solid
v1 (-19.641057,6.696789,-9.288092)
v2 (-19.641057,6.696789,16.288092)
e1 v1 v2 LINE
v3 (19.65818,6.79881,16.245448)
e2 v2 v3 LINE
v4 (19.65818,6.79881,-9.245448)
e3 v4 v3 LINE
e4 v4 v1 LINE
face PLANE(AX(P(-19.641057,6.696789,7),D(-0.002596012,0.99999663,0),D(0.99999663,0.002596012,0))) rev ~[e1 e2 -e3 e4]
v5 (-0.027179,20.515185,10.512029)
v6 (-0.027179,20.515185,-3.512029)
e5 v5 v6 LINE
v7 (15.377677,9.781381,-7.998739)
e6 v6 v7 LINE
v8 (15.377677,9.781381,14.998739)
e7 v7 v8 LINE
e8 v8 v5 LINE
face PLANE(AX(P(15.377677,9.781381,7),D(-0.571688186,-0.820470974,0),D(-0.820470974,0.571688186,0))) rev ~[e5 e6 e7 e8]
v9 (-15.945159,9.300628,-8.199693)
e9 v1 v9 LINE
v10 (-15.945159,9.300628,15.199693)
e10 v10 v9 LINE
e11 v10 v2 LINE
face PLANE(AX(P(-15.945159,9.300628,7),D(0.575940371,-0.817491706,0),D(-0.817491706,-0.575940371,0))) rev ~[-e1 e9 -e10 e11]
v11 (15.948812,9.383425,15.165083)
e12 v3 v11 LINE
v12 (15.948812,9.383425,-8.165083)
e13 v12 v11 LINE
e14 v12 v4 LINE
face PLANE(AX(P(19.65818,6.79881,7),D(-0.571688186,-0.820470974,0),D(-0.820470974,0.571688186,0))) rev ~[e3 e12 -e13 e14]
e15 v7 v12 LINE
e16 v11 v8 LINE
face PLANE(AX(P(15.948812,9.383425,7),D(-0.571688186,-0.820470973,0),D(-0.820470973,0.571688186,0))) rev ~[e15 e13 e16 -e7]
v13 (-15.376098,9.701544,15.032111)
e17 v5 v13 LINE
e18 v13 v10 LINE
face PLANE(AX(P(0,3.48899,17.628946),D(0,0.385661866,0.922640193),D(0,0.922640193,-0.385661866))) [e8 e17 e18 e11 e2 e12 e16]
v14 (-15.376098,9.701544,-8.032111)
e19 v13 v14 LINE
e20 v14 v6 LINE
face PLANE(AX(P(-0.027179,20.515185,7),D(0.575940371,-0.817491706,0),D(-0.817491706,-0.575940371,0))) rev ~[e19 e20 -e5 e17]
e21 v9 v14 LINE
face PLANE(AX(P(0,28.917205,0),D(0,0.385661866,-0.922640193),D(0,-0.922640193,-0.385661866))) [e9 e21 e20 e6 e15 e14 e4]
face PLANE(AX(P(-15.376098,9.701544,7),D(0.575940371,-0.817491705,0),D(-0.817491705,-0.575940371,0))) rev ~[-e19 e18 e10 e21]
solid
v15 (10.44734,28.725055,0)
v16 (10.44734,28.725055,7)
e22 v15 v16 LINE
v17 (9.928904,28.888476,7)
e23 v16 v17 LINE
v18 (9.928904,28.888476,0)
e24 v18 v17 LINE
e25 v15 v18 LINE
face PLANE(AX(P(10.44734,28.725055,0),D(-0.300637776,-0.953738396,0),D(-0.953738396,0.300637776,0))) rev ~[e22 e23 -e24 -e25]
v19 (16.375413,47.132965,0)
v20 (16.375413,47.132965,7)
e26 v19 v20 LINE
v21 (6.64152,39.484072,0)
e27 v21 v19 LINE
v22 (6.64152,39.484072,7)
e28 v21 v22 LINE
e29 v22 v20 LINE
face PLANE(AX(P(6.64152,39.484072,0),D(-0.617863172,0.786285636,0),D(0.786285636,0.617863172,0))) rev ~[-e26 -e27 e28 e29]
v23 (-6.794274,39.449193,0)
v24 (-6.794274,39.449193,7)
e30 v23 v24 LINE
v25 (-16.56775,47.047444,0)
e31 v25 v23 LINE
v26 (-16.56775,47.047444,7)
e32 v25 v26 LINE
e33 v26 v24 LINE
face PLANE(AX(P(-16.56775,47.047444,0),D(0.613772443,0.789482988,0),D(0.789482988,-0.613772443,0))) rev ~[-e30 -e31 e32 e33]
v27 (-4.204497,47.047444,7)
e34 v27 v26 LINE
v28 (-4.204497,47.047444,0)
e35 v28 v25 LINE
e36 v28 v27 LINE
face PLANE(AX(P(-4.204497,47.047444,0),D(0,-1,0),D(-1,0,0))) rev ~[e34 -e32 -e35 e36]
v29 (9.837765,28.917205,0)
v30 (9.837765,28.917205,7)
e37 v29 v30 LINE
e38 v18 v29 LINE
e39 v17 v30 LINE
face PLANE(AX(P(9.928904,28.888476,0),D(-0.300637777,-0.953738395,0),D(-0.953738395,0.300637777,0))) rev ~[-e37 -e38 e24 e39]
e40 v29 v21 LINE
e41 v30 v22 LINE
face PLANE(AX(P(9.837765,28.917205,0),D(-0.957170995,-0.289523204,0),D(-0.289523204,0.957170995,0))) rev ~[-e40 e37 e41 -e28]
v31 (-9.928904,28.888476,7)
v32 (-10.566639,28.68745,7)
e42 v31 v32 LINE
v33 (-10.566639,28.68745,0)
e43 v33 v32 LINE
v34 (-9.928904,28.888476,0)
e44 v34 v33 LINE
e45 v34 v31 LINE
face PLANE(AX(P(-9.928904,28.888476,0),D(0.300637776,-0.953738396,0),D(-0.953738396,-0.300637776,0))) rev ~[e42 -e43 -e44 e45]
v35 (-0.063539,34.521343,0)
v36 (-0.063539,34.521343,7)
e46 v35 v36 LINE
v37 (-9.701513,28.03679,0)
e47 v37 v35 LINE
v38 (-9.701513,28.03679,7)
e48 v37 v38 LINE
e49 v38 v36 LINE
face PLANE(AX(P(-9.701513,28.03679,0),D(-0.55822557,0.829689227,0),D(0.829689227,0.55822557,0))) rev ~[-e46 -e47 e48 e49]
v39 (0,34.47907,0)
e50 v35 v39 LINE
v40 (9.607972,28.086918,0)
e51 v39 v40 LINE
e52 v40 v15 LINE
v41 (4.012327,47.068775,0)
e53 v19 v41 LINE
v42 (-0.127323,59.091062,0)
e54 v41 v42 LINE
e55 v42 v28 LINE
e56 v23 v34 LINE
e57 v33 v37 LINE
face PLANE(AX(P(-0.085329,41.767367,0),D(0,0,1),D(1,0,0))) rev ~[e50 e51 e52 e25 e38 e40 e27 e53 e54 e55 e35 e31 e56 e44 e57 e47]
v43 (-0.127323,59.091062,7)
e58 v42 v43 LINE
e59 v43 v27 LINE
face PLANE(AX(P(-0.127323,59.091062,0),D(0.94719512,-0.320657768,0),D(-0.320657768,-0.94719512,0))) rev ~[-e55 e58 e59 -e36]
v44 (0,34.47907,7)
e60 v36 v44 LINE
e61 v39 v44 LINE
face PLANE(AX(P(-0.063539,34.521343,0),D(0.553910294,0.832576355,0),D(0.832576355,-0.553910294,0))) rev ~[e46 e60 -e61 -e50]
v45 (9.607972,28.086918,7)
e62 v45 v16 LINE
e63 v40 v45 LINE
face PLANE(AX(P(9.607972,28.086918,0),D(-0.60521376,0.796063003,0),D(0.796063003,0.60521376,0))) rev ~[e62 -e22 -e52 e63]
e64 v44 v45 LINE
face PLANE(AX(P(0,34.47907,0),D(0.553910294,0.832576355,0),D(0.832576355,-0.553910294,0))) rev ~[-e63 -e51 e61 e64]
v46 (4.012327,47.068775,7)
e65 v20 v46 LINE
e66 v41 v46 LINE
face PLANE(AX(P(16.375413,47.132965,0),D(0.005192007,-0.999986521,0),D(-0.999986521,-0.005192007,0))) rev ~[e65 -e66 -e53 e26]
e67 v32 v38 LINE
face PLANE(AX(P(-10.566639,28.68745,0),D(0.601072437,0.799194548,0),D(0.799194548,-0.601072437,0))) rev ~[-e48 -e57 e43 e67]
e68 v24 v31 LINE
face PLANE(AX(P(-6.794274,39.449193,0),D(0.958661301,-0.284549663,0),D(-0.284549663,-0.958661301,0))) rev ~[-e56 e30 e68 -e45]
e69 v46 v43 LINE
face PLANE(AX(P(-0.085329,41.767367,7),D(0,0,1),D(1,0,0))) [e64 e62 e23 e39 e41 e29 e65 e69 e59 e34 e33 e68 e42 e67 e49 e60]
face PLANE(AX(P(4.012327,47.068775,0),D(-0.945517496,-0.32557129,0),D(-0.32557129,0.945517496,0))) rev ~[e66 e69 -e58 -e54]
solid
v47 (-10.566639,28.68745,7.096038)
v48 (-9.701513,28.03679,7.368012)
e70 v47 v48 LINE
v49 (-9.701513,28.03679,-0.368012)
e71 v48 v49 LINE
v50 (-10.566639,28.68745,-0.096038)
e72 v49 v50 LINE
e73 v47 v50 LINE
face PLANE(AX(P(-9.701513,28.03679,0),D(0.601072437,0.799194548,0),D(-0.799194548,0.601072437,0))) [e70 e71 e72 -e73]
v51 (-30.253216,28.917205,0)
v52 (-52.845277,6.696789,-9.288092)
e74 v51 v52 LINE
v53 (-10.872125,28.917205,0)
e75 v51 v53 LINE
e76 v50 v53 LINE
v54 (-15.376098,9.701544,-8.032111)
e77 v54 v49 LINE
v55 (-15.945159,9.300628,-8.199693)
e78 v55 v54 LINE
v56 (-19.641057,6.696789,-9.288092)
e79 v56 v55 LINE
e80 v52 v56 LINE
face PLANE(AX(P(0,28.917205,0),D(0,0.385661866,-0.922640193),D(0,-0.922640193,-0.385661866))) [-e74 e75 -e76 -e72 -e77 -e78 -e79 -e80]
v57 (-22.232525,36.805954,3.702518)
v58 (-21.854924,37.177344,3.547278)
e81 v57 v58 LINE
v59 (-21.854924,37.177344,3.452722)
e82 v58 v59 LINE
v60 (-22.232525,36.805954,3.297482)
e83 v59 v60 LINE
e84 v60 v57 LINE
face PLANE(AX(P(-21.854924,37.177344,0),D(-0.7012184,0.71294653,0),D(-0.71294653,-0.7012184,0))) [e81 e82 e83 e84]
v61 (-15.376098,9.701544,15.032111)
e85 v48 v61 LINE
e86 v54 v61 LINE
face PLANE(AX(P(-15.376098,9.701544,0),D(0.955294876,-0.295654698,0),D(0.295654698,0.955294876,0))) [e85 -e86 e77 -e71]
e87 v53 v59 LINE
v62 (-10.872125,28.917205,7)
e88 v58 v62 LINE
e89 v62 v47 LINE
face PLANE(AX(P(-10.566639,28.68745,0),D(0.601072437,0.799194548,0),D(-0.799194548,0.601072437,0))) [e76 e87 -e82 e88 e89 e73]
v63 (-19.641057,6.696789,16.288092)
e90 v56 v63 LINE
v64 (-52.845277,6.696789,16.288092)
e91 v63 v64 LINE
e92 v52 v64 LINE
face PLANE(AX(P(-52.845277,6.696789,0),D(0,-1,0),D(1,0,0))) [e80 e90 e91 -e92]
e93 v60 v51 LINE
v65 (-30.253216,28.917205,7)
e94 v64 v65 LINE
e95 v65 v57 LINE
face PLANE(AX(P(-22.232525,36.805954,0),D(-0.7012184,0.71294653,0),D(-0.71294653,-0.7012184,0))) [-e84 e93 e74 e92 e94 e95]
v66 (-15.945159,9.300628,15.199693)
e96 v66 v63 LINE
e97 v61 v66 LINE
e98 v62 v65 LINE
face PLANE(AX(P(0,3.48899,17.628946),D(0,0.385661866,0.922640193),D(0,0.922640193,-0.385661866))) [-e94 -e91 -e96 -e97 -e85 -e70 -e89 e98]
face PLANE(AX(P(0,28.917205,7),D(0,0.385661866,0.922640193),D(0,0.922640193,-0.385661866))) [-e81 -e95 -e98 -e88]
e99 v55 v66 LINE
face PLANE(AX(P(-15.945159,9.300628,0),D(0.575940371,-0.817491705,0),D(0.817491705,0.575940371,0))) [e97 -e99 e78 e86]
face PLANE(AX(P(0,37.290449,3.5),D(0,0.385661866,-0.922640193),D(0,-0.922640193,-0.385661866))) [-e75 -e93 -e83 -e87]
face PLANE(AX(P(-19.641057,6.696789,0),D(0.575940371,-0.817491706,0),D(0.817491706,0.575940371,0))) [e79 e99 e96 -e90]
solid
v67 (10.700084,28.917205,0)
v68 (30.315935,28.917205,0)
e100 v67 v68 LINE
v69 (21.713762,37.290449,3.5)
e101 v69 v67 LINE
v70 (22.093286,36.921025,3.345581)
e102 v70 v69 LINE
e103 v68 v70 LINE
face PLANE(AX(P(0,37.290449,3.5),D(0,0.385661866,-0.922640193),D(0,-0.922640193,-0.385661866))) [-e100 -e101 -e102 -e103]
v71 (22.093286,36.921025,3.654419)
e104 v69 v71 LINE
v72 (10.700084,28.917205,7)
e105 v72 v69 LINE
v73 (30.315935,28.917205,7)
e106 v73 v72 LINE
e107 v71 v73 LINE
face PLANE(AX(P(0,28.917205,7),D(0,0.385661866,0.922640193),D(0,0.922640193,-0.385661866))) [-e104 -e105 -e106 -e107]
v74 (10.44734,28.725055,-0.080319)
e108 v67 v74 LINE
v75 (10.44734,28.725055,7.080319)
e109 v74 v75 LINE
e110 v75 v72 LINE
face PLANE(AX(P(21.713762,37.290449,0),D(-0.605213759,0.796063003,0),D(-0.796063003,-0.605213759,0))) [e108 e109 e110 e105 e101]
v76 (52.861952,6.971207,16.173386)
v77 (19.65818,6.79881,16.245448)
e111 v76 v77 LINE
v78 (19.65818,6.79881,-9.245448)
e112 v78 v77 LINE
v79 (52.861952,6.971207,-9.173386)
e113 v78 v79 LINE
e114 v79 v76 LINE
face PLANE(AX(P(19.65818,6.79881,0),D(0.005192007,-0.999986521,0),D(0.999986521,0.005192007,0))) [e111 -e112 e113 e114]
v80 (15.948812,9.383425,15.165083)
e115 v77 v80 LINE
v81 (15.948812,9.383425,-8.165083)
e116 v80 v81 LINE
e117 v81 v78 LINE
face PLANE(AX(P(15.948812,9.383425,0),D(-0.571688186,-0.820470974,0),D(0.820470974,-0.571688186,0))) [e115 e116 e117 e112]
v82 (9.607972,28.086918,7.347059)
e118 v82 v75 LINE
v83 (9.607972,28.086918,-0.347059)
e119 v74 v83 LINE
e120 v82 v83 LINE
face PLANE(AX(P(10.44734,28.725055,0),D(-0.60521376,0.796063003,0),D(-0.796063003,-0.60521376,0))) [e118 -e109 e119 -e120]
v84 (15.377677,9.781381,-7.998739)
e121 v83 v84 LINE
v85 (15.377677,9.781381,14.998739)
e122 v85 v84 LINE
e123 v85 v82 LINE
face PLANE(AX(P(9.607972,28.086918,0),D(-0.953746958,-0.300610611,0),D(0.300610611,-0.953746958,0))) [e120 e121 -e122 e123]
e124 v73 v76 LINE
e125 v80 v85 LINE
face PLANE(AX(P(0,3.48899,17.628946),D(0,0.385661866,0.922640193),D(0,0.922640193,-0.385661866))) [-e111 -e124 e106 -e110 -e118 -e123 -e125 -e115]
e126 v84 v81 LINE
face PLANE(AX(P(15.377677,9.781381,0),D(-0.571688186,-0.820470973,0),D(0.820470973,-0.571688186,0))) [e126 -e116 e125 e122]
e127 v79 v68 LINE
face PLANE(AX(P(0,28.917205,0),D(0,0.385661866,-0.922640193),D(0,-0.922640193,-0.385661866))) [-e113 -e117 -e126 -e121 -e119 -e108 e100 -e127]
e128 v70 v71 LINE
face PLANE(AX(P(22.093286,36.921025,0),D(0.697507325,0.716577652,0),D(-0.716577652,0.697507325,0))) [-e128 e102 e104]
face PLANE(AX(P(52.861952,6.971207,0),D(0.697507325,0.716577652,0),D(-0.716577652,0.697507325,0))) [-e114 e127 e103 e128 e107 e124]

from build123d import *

# Parameters (mm, degrees)
F1_DEPTH      = 7
F2_DEPTH      = 7
F3_DEPTH      = 25
F4_DEPTH      = 25
F5_DEPTH      = 25
F6_DEPTH      = 25
F8_DEPTH      = 52.8462768922
F8_DEPTH_BACK = 52.8629522723


with BuildPart() as f1:
    # F0 (on Top) → F1 (new body)
    with BuildSketch(Plane.XY):
        Polygon((-21.854923692, 37.1773435624), (-22.2325250506, 36.8059538305), (-52.8452768922, 6.6967885941), (-19.641056972, 6.6967885941), (-15.9451588988, 9.3006277457), (-15.3760976448, 9.7015435566), (-9.7015127861, 28.0367903236), (-10.566638607, 28.6874495242), align=None)
    extrude(amount=F1_DEPTH)

    # F3#2 (add): a face of the model
    f3_2_faces = [f1.faces().sort_by_distance(p)[0] for p in [
        (-27.1983175925, 18.5191974615, 7),
    ]]
    extrude(f3_2_faces, amount=F3_DEPTH)

    # F0 (on Top) → F4, piece 2 (join)
    with BuildSketch(Plane.XY):
        Polygon((-21.854923692, 37.1773435624), (-22.2325250506, 36.8059538305), (-52.8452768922, 6.6967885941), (-19.641056972, 6.6967885941), (-15.9451588988, 9.3006277457), (-15.3760976448, 9.7015435566), (-9.7015127861, 28.0367903236), (-10.566638607, 28.6874495242), align=None)
    extrude(amount=-F4_DEPTH)


with BuildPart() as f1b:
    # F0 (on Top) → F1, piece 2 (new body)
    with BuildSketch(Plane.XY):
        Polygon((15.9488124875, 9.3834251701), (19.6581798972, 6.7988102444), (52.8619522723, 6.9712067974), (22.0932860403, 36.9210245738), (21.713761513, 37.2904487909), (10.4473401343, 28.7250548337), (9.6079722369, 28.0869181552), (15.3776773458, 9.7813810071), align=None)
    extrude(amount=F1_DEPTH)

    # F3 (add): a face of the model
    f3_faces = [f1b.faces().sort_by_distance(p)[0] for p in [
        (27.1539566234, 18.6602971152, 7),
    ]]
    extrude(f3_faces, amount=F3_DEPTH)

    # F0 (on Top) → F4 (join)
    with BuildSketch(Plane.XY):
        Polygon((15.9488124875, 9.3834251701), (19.6581798972, 6.7988102444), (52.8619522723, 6.9712067974), (22.0932860403, 36.9210245738), (21.713761513, 37.2904487909), (10.4473401343, 28.7250548337), (9.6079722369, 28.0869181552), (15.3776773458, 9.7813810071), align=None)
    extrude(amount=-F4_DEPTH)


with BuildPart() as f2:
    # F0 (on Top) → F2 (new body)
    with BuildSketch(Plane.XY):
        Polygon((-15.9451588988, 9.3006277457), (-19.641056972, 6.6967885941), (19.6581798972, 6.7988102444), (15.9488124875, 9.3834251701), (15.3776773458, 9.7813810071), (-0.0271789608, 20.5151846831), (-15.3760976448, 9.7015435566), align=None)
    extrude(amount=F2_DEPTH)

    # F0 (on Top) → F5 (join)
    with BuildSketch(Plane.XY):
        Polygon((-15.9451588988, 9.3006277457), (-19.641056972, 6.6967885941), (19.6581798972, 6.7988102444), (15.9488124875, 9.3834251701), (15.3776773458, 9.7813810071), (-0.0271789608, 20.5151846831), (-15.3760976448, 9.7015435566), align=None)
    extrude(amount=-F5_DEPTH)

    # F6 (add): a face of the model
    f6_faces = [f2.faces().sort_by_distance(p)[0] for p in [
        (-0.0033520119, 11.3369278406, 7),
    ]]
    extrude(f6_faces, amount=F6_DEPTH)


with BuildPart() as f2b:
    # F0 (on Top) → F2, piece 2 (new body)
    with BuildSketch(Plane.XY):
        Polygon((-9.9289040496, 28.8884764516), (-10.566638607, 28.6874495242), (-9.7015127861, 28.0367903236), (-0.0635392434, 34.5213427361), (0, 34.4790702877), (9.6079722369, 28.0869181552), (10.4473401343, 28.7250548337), (9.9289040496, 28.8884764516), (9.837764806, 28.9172053984), (6.641519679, 39.484072189), (16.3754133549, 47.1329648367), (4.0123272981, 47.0687747382), (-0.1273227543, 59.0910619484), (-4.204497207, 47.0474436879), (-16.5677499026, 47.0474436879), (-6.794274319, 39.4491925836), align=None)
    extrude(amount=F2_DEPTH)


with BuildPart() as f8_tool:
    # F7 (on Right) → F8 (new body, two sides)
    with BuildSketch(Plane.YZ) as f8_sk:
        Polygon((28.9172053984, 7), (37.2904487909, 3.5), (40.2094684541, 37.8902927041), (3.4889901212, 37.8902927041), (3.4889901212, 17.6289461917), align=None)
        Polygon((40.2094684541, -30.8902927041), (37.2904487909, 3.5), (28.9172053984, 0), (3.4889901212, -10.6289461917), (3.4889901212, -30.8902927041), align=None)
    extrude(amount=-F8_DEPTH)
    extrude(f8_sk.sketch, amount=F8_DEPTH_BACK)


with BuildPart() as f1_1:
    add(f1.part)

    # F8: cut by f8_tool
    add(f8_tool.part, mode=Mode.SUBTRACT)


with BuildPart() as f1b_1:
    add(f1b.part)

    # F8: cut by f8_tool
    add(f8_tool.part, mode=Mode.SUBTRACT)


with BuildPart() as f2_1:
    add(f2.part)

    # F8: cut by f8_tool
    add(f8_tool.part, mode=Mode.SUBTRACT)


solid = Compound([f2b.part, f1_1.part, f1b_1.part, f2_1.part])
